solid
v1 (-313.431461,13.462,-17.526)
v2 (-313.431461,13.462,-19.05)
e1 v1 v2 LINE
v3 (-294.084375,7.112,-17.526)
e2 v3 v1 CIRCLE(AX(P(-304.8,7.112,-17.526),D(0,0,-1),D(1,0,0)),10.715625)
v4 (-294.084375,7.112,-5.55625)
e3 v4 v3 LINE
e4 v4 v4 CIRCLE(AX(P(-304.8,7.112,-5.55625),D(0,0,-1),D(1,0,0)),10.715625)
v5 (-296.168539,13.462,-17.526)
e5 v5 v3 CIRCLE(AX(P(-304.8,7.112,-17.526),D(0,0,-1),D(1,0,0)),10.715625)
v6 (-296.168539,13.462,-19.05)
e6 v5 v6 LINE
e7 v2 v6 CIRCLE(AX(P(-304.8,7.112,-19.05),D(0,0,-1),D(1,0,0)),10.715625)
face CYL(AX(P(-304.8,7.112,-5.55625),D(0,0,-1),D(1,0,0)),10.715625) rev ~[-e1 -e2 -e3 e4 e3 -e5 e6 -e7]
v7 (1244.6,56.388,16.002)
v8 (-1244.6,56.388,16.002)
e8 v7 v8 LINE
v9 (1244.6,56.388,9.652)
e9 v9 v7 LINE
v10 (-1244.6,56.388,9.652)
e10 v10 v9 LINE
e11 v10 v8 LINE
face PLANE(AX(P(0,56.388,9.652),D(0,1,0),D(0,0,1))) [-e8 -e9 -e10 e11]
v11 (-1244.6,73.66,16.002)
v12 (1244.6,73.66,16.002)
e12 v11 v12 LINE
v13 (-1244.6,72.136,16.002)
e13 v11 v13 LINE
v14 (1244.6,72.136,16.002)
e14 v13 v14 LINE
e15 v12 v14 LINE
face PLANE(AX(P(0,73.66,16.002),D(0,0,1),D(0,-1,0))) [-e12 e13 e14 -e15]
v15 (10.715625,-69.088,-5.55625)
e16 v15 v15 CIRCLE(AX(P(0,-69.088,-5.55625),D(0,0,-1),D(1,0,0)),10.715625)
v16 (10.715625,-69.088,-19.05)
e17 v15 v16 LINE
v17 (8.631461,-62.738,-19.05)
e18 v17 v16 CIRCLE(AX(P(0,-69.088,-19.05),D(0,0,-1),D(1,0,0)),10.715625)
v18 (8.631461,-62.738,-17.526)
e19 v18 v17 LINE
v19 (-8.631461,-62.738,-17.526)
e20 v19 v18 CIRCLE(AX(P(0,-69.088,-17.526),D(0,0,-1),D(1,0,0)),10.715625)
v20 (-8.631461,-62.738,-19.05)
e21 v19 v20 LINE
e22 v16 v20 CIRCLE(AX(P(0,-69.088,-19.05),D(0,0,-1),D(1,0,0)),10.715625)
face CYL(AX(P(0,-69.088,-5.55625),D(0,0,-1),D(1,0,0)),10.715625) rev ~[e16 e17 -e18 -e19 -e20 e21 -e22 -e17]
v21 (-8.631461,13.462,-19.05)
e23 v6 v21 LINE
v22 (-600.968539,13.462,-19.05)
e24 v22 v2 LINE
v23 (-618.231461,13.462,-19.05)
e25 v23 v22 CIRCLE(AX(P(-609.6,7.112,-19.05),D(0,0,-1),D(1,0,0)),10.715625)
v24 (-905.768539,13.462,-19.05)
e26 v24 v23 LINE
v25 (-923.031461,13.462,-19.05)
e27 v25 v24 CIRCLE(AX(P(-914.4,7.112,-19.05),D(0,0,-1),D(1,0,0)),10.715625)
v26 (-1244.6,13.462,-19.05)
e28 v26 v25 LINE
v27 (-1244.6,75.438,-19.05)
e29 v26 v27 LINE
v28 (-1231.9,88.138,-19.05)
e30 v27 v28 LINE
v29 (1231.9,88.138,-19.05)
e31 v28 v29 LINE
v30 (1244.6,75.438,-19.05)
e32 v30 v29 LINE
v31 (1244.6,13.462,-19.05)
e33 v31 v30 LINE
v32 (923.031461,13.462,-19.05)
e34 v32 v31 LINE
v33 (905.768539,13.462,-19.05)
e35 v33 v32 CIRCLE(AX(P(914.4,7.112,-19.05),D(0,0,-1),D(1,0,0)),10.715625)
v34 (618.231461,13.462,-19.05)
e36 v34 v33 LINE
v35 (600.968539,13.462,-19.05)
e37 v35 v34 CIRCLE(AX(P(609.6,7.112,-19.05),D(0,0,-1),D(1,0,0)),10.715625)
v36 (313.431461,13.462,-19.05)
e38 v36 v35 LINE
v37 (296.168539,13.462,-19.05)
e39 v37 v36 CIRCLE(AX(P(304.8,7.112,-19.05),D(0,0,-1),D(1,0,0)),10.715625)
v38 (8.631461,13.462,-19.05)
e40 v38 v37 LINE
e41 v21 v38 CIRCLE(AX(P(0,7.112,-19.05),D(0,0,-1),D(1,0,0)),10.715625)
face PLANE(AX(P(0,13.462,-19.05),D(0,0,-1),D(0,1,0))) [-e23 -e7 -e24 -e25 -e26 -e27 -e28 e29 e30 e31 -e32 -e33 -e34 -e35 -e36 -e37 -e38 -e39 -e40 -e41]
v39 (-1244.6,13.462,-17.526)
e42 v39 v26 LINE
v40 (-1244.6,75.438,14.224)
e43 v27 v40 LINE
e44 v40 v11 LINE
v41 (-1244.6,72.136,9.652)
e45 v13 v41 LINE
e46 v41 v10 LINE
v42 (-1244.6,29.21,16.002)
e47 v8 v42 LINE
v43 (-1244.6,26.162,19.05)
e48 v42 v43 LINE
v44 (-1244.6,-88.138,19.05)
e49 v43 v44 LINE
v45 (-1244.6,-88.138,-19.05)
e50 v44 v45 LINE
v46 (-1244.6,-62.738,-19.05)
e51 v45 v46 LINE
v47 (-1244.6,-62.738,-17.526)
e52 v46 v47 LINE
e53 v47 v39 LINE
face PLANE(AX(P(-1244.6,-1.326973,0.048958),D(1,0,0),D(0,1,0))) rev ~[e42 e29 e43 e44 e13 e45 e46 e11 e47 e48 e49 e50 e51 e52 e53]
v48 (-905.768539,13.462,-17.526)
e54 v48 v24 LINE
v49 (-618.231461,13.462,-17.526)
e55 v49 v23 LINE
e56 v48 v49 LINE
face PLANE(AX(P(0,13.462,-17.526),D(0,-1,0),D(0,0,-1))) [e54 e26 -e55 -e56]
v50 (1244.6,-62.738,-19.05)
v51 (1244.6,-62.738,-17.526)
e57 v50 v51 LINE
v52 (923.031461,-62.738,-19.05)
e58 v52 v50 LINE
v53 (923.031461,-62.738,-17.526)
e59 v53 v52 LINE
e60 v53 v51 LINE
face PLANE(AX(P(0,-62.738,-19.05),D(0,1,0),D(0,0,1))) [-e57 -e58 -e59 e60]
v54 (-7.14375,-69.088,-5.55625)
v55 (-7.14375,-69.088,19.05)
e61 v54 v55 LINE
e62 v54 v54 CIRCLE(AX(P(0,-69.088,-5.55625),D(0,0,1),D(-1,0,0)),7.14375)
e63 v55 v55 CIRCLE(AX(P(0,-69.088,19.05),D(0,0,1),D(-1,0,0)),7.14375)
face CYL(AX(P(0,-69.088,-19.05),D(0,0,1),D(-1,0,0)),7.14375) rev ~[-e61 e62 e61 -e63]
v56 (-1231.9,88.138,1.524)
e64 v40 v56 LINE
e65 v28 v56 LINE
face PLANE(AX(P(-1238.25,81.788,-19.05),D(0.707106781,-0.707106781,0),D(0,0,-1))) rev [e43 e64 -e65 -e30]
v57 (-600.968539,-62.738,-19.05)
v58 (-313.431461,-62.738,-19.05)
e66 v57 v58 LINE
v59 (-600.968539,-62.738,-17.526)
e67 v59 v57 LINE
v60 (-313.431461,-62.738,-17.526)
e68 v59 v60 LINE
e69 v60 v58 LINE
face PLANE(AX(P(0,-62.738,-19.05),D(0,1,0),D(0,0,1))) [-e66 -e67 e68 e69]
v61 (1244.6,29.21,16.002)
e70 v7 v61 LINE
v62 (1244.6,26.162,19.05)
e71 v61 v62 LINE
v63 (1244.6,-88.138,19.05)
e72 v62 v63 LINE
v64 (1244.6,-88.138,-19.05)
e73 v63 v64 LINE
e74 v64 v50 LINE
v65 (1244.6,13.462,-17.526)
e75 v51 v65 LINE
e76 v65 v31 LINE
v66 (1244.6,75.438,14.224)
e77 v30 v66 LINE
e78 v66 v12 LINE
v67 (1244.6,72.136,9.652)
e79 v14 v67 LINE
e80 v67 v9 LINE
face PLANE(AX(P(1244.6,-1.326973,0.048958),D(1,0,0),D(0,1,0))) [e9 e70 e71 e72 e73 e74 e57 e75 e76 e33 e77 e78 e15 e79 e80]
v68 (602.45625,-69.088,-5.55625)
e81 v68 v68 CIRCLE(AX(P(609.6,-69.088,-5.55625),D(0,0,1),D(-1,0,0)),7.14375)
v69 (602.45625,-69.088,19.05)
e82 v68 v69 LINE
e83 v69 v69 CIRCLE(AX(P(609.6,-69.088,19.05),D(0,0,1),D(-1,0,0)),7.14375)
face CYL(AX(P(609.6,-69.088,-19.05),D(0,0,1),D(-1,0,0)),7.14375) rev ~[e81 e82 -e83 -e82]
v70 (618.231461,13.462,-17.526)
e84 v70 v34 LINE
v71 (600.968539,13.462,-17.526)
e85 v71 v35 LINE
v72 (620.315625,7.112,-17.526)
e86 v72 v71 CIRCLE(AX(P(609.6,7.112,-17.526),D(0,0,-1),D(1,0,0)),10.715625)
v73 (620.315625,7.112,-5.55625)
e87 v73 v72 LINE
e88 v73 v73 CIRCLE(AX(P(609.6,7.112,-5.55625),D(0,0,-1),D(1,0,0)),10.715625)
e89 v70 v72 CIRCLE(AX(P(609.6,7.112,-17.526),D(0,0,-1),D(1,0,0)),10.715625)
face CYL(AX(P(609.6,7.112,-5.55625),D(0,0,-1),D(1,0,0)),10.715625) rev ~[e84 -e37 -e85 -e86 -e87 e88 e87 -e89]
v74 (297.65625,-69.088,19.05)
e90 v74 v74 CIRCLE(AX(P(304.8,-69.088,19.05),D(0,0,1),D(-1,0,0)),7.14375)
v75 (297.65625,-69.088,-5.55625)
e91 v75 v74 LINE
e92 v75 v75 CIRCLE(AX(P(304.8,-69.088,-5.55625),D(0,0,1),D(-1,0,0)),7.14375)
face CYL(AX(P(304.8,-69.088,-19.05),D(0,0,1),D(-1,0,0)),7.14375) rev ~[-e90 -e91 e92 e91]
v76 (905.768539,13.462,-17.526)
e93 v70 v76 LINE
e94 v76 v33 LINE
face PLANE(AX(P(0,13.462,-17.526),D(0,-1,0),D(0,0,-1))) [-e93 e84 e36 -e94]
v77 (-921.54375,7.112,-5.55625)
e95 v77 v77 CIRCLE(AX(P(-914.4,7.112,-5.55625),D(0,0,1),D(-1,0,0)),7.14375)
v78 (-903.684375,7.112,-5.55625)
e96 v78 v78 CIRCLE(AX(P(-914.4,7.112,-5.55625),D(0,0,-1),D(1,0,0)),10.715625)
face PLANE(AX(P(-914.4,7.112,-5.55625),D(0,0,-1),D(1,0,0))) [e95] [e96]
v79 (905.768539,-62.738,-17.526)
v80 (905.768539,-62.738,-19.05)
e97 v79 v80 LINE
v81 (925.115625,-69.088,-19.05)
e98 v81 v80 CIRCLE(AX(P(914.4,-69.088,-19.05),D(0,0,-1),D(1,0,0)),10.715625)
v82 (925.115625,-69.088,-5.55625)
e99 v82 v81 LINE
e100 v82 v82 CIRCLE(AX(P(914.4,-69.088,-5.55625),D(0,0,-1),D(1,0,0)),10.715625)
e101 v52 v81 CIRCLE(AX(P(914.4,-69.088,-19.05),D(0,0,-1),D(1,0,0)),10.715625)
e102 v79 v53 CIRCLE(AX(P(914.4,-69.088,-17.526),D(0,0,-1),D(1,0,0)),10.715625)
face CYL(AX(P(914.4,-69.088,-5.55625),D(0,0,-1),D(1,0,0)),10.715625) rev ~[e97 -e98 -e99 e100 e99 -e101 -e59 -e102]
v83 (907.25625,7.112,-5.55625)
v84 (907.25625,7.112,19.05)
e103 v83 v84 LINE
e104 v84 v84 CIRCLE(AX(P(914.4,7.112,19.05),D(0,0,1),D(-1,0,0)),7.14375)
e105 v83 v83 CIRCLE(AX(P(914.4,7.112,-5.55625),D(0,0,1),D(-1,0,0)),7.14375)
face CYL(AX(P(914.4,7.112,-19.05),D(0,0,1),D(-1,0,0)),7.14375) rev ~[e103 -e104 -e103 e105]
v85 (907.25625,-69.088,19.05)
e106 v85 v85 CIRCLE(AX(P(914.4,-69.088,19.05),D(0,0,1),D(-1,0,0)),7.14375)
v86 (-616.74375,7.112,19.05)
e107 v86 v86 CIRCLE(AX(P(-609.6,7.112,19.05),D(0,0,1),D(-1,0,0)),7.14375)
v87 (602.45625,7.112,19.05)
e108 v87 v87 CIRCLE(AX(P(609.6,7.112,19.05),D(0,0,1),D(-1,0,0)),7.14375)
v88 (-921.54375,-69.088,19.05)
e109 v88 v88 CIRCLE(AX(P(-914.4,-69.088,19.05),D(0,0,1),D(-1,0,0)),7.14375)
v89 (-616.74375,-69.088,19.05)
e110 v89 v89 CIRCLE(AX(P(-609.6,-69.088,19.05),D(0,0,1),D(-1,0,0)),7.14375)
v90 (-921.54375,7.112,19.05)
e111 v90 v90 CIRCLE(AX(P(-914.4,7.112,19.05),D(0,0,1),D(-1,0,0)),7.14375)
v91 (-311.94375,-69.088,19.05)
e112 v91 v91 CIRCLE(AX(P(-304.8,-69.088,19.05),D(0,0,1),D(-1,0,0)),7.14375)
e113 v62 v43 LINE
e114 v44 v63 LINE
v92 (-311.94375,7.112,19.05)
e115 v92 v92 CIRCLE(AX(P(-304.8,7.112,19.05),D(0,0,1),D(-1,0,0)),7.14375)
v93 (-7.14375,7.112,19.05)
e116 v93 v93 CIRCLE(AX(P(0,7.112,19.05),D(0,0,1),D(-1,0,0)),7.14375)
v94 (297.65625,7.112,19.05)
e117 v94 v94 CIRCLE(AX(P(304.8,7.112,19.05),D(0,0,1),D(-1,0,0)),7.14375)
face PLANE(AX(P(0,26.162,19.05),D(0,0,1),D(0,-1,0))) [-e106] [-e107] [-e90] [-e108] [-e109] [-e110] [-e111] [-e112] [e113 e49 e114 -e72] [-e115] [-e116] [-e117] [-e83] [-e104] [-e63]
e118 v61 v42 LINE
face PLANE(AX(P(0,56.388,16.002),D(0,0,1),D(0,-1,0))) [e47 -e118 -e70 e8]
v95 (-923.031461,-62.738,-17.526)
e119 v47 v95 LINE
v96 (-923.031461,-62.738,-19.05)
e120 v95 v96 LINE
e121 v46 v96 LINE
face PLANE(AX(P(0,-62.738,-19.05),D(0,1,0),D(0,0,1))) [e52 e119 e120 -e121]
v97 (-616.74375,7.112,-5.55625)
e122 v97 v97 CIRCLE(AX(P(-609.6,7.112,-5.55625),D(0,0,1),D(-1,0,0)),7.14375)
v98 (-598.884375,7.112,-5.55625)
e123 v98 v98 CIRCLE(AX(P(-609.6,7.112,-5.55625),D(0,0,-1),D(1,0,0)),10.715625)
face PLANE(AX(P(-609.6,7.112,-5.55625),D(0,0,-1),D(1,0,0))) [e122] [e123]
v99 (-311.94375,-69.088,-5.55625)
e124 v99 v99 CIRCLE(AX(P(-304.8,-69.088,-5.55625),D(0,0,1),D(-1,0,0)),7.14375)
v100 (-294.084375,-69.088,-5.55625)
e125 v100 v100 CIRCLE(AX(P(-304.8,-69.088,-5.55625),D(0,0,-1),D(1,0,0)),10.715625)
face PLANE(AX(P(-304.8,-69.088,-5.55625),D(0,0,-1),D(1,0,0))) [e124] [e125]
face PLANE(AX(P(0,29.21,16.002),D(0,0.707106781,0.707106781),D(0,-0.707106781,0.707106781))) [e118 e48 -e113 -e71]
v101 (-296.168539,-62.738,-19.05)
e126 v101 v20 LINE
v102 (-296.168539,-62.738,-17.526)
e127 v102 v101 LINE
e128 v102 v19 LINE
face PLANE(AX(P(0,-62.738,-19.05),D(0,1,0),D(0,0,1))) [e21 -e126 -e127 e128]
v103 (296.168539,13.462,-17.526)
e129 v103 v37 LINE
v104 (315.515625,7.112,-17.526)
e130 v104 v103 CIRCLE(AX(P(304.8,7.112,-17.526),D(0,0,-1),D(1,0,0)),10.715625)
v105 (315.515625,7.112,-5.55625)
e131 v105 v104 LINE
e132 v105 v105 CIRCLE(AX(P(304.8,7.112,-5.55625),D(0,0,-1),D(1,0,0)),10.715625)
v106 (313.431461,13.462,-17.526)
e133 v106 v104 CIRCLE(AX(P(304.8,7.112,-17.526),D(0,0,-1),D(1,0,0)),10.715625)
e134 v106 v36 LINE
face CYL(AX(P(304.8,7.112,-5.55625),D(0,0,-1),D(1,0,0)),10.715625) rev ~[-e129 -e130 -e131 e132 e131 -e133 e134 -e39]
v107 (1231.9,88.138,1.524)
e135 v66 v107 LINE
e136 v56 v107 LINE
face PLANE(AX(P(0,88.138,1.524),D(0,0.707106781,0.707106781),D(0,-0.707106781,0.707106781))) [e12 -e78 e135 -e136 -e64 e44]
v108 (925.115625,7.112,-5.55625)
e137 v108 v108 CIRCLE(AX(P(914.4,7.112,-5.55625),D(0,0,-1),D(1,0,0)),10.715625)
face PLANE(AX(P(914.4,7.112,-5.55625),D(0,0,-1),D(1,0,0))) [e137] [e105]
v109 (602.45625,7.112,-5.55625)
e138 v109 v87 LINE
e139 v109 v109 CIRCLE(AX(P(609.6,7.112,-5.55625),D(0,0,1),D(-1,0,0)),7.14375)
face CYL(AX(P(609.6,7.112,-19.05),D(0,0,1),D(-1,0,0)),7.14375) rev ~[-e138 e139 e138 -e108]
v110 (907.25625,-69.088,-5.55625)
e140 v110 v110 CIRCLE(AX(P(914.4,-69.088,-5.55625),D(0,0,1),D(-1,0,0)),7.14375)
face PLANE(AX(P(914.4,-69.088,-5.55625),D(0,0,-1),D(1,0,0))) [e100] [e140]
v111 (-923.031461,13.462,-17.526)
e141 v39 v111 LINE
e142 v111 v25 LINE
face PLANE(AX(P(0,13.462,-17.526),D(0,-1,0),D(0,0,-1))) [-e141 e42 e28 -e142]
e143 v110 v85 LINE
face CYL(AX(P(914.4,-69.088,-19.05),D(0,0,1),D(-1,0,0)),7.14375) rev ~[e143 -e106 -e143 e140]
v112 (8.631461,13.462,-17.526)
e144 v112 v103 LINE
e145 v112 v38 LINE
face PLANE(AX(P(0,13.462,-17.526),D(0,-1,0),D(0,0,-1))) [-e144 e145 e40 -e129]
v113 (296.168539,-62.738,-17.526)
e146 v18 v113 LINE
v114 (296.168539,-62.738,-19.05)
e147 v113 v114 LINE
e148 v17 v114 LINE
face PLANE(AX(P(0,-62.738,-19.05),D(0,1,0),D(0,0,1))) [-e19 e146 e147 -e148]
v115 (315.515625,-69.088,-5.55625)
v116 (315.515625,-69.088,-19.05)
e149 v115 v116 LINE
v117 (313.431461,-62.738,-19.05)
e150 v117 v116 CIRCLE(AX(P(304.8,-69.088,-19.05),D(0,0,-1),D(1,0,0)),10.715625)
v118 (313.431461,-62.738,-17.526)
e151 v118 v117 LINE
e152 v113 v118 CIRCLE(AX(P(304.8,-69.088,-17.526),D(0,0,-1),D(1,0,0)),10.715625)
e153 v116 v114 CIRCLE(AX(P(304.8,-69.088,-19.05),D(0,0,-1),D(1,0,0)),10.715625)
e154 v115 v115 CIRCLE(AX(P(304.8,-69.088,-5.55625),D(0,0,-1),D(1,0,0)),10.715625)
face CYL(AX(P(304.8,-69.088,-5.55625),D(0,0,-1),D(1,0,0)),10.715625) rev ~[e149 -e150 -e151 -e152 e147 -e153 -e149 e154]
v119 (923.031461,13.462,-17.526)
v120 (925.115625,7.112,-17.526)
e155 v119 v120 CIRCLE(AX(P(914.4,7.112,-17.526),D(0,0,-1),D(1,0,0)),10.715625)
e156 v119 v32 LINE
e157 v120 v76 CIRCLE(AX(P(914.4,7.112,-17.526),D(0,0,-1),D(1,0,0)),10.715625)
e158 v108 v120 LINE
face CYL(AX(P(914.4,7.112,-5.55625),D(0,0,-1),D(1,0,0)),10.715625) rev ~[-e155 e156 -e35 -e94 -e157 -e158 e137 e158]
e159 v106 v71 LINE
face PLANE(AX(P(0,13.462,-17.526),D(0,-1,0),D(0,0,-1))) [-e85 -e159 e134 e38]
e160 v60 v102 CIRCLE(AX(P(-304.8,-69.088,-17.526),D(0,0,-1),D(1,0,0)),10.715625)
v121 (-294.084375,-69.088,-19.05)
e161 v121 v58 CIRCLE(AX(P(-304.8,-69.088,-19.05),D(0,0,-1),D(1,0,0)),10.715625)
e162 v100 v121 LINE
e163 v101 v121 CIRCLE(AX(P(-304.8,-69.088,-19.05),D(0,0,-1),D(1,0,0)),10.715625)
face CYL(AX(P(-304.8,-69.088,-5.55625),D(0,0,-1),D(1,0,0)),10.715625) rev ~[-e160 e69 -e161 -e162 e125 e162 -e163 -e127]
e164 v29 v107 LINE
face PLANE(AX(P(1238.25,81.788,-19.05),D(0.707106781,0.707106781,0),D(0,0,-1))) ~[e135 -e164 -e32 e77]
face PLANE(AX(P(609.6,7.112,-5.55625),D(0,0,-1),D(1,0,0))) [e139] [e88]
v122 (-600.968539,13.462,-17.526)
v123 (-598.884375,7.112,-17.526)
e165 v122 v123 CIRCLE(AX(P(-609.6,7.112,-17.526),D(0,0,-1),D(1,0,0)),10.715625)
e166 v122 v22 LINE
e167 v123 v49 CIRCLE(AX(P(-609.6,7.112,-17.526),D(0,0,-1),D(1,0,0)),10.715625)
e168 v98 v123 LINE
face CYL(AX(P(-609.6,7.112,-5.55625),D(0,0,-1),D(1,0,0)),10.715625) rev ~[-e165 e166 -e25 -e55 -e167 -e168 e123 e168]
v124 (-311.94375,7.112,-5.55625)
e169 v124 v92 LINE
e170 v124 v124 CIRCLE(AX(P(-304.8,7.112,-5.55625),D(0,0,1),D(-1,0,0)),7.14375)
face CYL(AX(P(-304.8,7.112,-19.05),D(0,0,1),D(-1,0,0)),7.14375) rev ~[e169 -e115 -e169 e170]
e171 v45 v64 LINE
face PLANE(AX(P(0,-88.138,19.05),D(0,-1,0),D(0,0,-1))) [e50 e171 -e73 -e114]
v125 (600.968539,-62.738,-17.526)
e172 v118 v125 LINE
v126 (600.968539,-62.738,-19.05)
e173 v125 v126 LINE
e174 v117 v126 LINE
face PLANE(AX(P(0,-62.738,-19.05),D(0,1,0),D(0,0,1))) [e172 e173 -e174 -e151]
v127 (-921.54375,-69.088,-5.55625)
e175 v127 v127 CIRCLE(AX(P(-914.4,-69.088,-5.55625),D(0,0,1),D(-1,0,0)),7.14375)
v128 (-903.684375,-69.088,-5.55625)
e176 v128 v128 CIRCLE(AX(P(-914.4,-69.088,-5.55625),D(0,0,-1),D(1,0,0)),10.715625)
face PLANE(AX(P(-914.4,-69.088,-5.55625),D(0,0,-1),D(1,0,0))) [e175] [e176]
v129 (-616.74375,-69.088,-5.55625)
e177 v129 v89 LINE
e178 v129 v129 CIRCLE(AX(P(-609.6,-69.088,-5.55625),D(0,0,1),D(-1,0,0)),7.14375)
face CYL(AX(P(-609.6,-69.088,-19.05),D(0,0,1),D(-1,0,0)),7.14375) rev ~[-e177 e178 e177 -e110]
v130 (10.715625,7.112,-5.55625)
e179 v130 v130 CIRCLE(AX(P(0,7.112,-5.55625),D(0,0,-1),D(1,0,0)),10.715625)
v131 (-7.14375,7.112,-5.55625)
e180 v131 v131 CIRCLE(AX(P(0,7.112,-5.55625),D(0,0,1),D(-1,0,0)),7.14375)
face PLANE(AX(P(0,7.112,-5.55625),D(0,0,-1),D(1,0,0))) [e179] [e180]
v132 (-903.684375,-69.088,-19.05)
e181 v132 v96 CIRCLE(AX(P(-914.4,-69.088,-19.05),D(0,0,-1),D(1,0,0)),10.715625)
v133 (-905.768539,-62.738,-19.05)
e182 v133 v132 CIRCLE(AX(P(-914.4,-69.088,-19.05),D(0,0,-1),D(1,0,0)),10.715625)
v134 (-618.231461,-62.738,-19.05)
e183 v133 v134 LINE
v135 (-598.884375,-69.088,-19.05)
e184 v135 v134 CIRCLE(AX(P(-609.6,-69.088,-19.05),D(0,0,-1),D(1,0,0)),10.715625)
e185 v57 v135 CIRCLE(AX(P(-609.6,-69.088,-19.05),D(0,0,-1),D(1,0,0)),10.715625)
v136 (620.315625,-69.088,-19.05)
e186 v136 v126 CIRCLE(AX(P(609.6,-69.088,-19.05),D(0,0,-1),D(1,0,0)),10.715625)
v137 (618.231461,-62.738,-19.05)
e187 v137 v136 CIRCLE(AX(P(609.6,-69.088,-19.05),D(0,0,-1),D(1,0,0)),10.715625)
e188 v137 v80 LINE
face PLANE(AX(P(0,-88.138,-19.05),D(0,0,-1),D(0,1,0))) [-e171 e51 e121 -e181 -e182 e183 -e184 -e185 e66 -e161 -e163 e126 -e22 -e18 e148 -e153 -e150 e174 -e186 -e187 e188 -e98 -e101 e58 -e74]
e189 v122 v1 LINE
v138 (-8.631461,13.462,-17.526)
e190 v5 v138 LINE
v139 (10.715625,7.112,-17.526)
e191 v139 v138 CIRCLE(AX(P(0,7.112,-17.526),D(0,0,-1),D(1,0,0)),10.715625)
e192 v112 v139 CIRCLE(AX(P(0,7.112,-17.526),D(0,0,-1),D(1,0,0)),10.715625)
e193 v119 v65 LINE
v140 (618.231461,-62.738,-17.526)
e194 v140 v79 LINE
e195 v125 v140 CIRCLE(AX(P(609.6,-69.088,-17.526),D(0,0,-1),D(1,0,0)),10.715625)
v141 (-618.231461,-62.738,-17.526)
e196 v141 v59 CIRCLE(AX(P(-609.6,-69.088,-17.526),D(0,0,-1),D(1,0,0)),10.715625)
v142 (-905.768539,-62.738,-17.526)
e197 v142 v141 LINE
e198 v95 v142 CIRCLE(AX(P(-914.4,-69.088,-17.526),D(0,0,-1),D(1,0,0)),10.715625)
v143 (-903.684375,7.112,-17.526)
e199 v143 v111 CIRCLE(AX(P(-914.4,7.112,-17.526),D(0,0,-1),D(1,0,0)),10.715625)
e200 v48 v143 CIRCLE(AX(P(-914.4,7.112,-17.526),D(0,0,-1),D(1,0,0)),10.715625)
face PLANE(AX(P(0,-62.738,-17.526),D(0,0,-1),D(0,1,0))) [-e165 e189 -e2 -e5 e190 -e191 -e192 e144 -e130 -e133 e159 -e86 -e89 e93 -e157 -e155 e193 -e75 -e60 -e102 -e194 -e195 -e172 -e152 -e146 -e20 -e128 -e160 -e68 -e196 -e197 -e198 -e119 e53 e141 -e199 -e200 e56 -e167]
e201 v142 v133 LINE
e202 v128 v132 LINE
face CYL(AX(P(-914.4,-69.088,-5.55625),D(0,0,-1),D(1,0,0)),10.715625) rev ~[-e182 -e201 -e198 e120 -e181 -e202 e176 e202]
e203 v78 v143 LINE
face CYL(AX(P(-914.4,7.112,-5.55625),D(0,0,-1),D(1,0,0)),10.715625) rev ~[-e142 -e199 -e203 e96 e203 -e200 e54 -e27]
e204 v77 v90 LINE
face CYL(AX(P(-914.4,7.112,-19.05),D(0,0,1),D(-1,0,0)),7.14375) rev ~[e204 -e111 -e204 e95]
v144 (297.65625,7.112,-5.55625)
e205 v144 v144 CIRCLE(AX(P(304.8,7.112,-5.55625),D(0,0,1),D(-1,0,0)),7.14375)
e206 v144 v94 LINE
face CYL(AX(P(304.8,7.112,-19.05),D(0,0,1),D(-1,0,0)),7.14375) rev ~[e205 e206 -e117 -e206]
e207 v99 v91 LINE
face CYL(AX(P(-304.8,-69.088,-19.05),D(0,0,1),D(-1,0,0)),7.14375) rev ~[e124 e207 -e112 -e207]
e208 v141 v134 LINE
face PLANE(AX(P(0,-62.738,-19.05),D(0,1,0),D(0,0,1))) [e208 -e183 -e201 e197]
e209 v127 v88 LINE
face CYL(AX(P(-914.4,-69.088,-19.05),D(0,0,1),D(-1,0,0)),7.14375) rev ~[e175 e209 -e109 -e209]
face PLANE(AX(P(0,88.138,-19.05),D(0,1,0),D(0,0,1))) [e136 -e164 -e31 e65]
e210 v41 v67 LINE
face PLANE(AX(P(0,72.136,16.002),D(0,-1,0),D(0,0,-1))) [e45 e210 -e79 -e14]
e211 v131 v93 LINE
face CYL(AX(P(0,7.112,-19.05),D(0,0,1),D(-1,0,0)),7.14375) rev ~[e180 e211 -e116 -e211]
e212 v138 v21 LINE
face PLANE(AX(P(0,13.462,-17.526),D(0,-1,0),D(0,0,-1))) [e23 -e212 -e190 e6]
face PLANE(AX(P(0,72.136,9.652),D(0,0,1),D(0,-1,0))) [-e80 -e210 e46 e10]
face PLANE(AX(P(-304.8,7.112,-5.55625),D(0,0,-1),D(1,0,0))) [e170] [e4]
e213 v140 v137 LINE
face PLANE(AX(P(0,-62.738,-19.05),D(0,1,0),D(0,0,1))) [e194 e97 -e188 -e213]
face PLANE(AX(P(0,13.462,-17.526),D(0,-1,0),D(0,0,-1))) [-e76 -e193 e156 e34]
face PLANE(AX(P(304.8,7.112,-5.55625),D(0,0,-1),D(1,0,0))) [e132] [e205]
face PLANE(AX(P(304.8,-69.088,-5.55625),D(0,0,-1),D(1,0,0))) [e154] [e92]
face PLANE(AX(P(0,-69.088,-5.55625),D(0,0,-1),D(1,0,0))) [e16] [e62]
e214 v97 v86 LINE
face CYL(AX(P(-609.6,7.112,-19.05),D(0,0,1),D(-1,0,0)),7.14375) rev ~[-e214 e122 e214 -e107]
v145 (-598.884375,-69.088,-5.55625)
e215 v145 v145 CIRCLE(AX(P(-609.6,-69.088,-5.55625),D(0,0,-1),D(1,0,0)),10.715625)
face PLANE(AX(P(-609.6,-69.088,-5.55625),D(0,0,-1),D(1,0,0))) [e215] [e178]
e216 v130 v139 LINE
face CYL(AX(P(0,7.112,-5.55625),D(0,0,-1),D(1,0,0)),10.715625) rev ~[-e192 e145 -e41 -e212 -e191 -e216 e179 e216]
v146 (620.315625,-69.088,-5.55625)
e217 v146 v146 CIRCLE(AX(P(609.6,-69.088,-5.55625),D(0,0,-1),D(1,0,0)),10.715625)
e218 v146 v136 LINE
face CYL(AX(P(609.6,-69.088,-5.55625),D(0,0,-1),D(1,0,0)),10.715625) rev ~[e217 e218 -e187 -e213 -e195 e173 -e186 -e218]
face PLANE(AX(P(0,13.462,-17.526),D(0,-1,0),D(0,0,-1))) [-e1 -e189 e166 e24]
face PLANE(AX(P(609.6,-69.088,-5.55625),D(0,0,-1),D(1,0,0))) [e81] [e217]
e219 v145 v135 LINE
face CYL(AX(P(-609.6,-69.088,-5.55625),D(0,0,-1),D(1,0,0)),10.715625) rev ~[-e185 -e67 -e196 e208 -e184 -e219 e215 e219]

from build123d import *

# Parameters (mm, degrees)
F0_W           = 14.224
F0_H           = 20.574
F1_DEPTH       = 1244.6
F3_D           = 14.2875
F3_CBORE_D     = 21.43125
F3_CBORE_DEPTH = 13.49375
F4_SIZE        = 12.7


# Not quite as in the source:
# - a length typed as a fraction of an inch, garbled in the dataset ("3 / 203.2 mm" for 3/8 in), is restored


with BuildPart() as f1:
    # F0 (on Right) → F1 (new body, symmetric)
    with BuildSketch(Plane.YZ):
        Polygon((26.162, 19.05), (-88.138, 19.05), (-88.138, -19.05), (-62.738, -19.05), (-62.738, -17.526), (13.462, -17.526), (13.462, -19.05), (73.914, -19.05), (73.914, 1.524), (88.138, 1.524), (73.66, 16.002), (72.136, 16.002), (72.136, 9.652), (56.388, 9.652), (56.388, 16.002), (29.21, 16.002), align=None)
        with Locations((81.026, -8.763)):
            Rectangle(F0_W, F0_H)
    extrude(amount=F1_DEPTH, both=True)

    # F3 (through all)
    with Locations(Plane(origin=(0, 0, -19.05), x_dir=(1, 0, 0), z_dir=(0, 0, -1))):
        with Locations((914.4, -7.112), (914.4, 69.088), (609.6, 69.088), (609.6, -7.112), (304.8, -7.112), (304.8, 69.088), (0, -7.112), (0, 69.088), (-304.8, -7.112), (-304.8, 69.088), (-609.6, -7.112), (-609.6, 69.088), (-914.4, -7.112), (-914.4, 69.088)):
            CounterBoreHole(F3_D / 2, F3_CBORE_D / 2, F3_CBORE_DEPTH)

    # F4
    f4_edges = [f1.edges().sort_by_distance(p)[0] for p in [
        (1244.6, 88.138, -8.763),
        (-1244.6, 88.138, -8.763),
    ]]
    chamfer(f4_edges, length=F4_SIZE)


solid = f1.part
